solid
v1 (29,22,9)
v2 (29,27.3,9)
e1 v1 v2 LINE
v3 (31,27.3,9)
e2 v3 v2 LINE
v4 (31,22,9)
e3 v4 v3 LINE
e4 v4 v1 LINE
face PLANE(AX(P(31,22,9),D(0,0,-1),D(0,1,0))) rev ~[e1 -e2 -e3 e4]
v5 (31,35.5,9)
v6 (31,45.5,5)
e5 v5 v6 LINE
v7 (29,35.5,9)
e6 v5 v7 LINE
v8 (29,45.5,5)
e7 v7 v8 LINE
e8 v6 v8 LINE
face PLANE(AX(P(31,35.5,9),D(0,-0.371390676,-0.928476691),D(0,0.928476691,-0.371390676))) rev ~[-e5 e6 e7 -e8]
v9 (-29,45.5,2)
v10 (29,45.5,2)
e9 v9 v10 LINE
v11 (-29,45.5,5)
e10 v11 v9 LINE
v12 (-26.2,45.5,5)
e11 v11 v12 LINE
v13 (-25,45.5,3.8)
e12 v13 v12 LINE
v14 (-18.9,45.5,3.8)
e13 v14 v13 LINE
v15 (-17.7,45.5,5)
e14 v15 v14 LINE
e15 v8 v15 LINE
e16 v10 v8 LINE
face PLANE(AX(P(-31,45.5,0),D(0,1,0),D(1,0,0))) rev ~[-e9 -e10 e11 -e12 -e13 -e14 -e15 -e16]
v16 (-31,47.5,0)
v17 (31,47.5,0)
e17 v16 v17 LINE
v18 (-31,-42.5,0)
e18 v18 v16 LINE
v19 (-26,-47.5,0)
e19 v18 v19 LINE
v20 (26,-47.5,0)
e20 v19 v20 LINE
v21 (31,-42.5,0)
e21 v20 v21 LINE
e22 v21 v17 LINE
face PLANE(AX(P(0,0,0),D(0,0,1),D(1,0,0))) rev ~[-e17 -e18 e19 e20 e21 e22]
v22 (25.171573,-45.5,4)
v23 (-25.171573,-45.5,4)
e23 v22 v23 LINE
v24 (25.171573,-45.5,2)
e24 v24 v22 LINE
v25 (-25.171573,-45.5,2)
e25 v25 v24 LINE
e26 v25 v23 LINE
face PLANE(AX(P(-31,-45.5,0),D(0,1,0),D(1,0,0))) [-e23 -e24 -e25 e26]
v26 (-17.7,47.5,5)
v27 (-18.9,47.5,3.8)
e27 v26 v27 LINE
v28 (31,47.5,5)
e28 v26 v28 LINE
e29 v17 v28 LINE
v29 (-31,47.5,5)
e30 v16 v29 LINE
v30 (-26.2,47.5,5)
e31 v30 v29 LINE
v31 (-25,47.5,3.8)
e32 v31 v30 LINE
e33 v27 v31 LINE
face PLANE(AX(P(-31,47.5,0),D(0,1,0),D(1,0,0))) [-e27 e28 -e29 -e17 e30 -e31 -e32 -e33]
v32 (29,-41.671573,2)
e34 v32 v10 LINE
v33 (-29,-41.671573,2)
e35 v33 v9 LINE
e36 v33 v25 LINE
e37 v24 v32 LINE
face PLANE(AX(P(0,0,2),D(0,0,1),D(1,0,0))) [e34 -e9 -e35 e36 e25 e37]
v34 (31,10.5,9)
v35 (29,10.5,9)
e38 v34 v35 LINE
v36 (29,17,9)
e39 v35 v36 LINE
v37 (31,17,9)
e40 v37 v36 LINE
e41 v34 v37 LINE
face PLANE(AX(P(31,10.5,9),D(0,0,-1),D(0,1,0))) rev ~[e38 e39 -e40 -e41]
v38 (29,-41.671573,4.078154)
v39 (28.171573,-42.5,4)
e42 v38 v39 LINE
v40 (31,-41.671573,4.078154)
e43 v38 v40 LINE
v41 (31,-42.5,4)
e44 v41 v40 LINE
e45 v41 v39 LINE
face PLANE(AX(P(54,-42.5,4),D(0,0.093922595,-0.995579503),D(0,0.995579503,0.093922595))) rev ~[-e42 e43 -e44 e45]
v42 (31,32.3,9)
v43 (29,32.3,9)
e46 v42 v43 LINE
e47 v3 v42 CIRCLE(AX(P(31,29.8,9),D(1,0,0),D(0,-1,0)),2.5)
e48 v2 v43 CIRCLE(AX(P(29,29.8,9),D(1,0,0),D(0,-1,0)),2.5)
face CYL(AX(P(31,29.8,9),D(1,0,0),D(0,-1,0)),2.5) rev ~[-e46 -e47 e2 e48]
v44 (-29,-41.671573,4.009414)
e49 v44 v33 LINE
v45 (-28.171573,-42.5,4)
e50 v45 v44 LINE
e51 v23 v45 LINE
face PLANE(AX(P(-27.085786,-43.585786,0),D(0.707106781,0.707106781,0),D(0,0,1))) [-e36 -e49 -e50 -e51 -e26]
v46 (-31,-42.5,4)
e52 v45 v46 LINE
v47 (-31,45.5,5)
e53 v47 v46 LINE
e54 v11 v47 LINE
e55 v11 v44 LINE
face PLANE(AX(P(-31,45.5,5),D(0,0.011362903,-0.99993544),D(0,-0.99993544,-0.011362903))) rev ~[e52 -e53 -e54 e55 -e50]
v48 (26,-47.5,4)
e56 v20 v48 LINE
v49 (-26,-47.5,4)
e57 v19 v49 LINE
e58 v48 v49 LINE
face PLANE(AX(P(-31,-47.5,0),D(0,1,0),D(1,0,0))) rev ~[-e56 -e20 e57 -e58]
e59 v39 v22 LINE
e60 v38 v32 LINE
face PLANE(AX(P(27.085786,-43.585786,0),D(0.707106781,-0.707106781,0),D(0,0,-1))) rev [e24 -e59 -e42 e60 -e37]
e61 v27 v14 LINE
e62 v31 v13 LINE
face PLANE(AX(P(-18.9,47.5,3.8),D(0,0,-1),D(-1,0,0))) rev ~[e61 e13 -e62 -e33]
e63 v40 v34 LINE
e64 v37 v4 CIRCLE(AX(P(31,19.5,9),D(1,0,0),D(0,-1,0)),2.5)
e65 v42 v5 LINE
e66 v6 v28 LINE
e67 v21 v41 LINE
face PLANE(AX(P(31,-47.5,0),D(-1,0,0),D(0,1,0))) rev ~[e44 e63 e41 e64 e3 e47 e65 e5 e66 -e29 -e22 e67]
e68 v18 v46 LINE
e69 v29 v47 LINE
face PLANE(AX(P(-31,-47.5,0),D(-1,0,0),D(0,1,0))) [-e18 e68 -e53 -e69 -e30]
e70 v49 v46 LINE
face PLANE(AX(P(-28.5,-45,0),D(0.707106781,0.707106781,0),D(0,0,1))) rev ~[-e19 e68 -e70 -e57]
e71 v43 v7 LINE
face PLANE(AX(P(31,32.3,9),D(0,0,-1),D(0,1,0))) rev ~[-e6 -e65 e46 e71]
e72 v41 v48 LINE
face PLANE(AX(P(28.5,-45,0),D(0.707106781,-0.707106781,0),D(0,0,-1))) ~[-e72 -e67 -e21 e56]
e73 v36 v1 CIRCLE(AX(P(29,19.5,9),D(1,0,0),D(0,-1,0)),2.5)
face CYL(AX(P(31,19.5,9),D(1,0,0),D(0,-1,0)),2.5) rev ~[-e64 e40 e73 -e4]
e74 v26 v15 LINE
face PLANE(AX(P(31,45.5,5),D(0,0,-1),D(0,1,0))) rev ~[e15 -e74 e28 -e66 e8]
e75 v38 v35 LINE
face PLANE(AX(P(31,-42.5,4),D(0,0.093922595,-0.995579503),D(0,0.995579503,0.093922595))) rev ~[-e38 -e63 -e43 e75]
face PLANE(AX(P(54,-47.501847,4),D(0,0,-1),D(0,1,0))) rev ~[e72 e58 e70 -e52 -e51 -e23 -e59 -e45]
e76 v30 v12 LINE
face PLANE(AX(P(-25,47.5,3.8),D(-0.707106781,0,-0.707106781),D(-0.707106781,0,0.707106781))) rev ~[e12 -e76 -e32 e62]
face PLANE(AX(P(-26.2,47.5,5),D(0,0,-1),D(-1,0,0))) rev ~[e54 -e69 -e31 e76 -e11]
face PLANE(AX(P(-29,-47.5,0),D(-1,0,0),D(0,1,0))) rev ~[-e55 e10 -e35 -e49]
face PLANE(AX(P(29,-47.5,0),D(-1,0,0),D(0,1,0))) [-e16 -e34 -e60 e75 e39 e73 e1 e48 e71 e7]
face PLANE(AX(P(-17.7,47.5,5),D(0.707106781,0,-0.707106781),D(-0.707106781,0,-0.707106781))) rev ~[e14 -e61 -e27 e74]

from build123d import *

# Parameters (mm, degrees)
F0_W      = 62
F0_H      = 95
F1_DEPTH  = 9
F2_SIZE   = 5
F3_T      = -2
F5_DEPTH  = 2
F7_DEPTH  = 2
F8_DEPTH  = 25
F10_DEPTH = 90
F12_DEPTH = 3


with BuildPart() as f1:
    # F0 (on Top) → F1 (new body)
    with BuildSketch(Plane.XY):
        Rectangle(F0_W, F0_H)
    extrude(amount=F1_DEPTH)

    # F2
    f2_edges = [f1.edges().sort_by_distance(p)[0] for p in [
        (-31, -47.5, 4.5),
        (31, -47.5, 4.5),
    ]]
    chamfer(f2_edges, length=F2_SIZE)

    # F3
    f3_openings = [f1.faces().sort_by_distance(p)[0] for p in [
        (0, 0.195368, 9),
    ]]
    offset(amount=F3_T, openings=f3_openings)

    # F4 (on face) → F5 (cut)
    with BuildSketch(Plane.YZ.offset(31)):
        with BuildLine():
            ThreePointArc((27.3, 9), (29.8, 6.5), (32.3, 9))
            Line((32.3, 9), (35.5, 9))
            Line((35.5, 9), (45.5, 5))
            Line((45.5, 5), (47.5, 5))
            Line((47.5, 5), (47.5, 10))
            Line((47.5, 10), (-47.5, 10))
            Line((-47.5, 10), (-47.5, 4))
            Line((-47.5, 4), (-42.5, 4))
            Line((-42.5, 4), (10.5, 9))
            Line((10.5, 9), (17, 9))
            ThreePointArc((17, 9), (19.5, 6.5), (22, 9))
            Line((22, 9), (27.3, 9))
        make_face()
    extrude(amount=-F5_DEPTH, mode=Mode.SUBTRACT)

    # F6 (on face) → F7 (cut)
    with BuildSketch(Plane(origin=(0, 47.5, 0), x_dir=(-1, 0, 0), z_dir=(0, 1, 0))):
        Polygon((-29, 9), (-29, 5), (-25.9392373264, 5), (17.7, 5), (18.9, 3.8), (25, 3.8), (26.2, 5), (31, 5), (31, 9), align=None)
    extrude(amount=-F7_DEPTH, mode=Mode.SUBTRACT)

    # F8 (add): a face of the model
    f8_faces = [f1.faces().sort_by_distance(p)[0] for p in [
        (29, -43.0883975313, 6.5056760177),
    ]]
    extrude(f8_faces, amount=F8_DEPTH)

    # F9 (on face) → F10 (cut)
    with BuildSketch(Plane.YZ.offset(54)):
        Polygon((-42.5, 4), (-41.6715728753, 4.0781535023), (-41.6715728753, 9.3699973077), (-47.5018471479, 9.3699973077), (-47.5018471479, 4), align=None)
    extrude(amount=-F10_DEPTH, mode=Mode.SUBTRACT)

    # F11 (on face) → F12 (cut)
    with BuildSketch(Plane(origin=(-31, 0, 0), x_dir=(0, -1, 0), z_dir=(-1, 0, 0))):
        Polygon((-45.5, 9), (-45.5, 5), (42.5, 4), (42.5568181818, 9), align=None)
    extrude(amount=-F12_DEPTH, mode=Mode.SUBTRACT)


solid = f1.part
